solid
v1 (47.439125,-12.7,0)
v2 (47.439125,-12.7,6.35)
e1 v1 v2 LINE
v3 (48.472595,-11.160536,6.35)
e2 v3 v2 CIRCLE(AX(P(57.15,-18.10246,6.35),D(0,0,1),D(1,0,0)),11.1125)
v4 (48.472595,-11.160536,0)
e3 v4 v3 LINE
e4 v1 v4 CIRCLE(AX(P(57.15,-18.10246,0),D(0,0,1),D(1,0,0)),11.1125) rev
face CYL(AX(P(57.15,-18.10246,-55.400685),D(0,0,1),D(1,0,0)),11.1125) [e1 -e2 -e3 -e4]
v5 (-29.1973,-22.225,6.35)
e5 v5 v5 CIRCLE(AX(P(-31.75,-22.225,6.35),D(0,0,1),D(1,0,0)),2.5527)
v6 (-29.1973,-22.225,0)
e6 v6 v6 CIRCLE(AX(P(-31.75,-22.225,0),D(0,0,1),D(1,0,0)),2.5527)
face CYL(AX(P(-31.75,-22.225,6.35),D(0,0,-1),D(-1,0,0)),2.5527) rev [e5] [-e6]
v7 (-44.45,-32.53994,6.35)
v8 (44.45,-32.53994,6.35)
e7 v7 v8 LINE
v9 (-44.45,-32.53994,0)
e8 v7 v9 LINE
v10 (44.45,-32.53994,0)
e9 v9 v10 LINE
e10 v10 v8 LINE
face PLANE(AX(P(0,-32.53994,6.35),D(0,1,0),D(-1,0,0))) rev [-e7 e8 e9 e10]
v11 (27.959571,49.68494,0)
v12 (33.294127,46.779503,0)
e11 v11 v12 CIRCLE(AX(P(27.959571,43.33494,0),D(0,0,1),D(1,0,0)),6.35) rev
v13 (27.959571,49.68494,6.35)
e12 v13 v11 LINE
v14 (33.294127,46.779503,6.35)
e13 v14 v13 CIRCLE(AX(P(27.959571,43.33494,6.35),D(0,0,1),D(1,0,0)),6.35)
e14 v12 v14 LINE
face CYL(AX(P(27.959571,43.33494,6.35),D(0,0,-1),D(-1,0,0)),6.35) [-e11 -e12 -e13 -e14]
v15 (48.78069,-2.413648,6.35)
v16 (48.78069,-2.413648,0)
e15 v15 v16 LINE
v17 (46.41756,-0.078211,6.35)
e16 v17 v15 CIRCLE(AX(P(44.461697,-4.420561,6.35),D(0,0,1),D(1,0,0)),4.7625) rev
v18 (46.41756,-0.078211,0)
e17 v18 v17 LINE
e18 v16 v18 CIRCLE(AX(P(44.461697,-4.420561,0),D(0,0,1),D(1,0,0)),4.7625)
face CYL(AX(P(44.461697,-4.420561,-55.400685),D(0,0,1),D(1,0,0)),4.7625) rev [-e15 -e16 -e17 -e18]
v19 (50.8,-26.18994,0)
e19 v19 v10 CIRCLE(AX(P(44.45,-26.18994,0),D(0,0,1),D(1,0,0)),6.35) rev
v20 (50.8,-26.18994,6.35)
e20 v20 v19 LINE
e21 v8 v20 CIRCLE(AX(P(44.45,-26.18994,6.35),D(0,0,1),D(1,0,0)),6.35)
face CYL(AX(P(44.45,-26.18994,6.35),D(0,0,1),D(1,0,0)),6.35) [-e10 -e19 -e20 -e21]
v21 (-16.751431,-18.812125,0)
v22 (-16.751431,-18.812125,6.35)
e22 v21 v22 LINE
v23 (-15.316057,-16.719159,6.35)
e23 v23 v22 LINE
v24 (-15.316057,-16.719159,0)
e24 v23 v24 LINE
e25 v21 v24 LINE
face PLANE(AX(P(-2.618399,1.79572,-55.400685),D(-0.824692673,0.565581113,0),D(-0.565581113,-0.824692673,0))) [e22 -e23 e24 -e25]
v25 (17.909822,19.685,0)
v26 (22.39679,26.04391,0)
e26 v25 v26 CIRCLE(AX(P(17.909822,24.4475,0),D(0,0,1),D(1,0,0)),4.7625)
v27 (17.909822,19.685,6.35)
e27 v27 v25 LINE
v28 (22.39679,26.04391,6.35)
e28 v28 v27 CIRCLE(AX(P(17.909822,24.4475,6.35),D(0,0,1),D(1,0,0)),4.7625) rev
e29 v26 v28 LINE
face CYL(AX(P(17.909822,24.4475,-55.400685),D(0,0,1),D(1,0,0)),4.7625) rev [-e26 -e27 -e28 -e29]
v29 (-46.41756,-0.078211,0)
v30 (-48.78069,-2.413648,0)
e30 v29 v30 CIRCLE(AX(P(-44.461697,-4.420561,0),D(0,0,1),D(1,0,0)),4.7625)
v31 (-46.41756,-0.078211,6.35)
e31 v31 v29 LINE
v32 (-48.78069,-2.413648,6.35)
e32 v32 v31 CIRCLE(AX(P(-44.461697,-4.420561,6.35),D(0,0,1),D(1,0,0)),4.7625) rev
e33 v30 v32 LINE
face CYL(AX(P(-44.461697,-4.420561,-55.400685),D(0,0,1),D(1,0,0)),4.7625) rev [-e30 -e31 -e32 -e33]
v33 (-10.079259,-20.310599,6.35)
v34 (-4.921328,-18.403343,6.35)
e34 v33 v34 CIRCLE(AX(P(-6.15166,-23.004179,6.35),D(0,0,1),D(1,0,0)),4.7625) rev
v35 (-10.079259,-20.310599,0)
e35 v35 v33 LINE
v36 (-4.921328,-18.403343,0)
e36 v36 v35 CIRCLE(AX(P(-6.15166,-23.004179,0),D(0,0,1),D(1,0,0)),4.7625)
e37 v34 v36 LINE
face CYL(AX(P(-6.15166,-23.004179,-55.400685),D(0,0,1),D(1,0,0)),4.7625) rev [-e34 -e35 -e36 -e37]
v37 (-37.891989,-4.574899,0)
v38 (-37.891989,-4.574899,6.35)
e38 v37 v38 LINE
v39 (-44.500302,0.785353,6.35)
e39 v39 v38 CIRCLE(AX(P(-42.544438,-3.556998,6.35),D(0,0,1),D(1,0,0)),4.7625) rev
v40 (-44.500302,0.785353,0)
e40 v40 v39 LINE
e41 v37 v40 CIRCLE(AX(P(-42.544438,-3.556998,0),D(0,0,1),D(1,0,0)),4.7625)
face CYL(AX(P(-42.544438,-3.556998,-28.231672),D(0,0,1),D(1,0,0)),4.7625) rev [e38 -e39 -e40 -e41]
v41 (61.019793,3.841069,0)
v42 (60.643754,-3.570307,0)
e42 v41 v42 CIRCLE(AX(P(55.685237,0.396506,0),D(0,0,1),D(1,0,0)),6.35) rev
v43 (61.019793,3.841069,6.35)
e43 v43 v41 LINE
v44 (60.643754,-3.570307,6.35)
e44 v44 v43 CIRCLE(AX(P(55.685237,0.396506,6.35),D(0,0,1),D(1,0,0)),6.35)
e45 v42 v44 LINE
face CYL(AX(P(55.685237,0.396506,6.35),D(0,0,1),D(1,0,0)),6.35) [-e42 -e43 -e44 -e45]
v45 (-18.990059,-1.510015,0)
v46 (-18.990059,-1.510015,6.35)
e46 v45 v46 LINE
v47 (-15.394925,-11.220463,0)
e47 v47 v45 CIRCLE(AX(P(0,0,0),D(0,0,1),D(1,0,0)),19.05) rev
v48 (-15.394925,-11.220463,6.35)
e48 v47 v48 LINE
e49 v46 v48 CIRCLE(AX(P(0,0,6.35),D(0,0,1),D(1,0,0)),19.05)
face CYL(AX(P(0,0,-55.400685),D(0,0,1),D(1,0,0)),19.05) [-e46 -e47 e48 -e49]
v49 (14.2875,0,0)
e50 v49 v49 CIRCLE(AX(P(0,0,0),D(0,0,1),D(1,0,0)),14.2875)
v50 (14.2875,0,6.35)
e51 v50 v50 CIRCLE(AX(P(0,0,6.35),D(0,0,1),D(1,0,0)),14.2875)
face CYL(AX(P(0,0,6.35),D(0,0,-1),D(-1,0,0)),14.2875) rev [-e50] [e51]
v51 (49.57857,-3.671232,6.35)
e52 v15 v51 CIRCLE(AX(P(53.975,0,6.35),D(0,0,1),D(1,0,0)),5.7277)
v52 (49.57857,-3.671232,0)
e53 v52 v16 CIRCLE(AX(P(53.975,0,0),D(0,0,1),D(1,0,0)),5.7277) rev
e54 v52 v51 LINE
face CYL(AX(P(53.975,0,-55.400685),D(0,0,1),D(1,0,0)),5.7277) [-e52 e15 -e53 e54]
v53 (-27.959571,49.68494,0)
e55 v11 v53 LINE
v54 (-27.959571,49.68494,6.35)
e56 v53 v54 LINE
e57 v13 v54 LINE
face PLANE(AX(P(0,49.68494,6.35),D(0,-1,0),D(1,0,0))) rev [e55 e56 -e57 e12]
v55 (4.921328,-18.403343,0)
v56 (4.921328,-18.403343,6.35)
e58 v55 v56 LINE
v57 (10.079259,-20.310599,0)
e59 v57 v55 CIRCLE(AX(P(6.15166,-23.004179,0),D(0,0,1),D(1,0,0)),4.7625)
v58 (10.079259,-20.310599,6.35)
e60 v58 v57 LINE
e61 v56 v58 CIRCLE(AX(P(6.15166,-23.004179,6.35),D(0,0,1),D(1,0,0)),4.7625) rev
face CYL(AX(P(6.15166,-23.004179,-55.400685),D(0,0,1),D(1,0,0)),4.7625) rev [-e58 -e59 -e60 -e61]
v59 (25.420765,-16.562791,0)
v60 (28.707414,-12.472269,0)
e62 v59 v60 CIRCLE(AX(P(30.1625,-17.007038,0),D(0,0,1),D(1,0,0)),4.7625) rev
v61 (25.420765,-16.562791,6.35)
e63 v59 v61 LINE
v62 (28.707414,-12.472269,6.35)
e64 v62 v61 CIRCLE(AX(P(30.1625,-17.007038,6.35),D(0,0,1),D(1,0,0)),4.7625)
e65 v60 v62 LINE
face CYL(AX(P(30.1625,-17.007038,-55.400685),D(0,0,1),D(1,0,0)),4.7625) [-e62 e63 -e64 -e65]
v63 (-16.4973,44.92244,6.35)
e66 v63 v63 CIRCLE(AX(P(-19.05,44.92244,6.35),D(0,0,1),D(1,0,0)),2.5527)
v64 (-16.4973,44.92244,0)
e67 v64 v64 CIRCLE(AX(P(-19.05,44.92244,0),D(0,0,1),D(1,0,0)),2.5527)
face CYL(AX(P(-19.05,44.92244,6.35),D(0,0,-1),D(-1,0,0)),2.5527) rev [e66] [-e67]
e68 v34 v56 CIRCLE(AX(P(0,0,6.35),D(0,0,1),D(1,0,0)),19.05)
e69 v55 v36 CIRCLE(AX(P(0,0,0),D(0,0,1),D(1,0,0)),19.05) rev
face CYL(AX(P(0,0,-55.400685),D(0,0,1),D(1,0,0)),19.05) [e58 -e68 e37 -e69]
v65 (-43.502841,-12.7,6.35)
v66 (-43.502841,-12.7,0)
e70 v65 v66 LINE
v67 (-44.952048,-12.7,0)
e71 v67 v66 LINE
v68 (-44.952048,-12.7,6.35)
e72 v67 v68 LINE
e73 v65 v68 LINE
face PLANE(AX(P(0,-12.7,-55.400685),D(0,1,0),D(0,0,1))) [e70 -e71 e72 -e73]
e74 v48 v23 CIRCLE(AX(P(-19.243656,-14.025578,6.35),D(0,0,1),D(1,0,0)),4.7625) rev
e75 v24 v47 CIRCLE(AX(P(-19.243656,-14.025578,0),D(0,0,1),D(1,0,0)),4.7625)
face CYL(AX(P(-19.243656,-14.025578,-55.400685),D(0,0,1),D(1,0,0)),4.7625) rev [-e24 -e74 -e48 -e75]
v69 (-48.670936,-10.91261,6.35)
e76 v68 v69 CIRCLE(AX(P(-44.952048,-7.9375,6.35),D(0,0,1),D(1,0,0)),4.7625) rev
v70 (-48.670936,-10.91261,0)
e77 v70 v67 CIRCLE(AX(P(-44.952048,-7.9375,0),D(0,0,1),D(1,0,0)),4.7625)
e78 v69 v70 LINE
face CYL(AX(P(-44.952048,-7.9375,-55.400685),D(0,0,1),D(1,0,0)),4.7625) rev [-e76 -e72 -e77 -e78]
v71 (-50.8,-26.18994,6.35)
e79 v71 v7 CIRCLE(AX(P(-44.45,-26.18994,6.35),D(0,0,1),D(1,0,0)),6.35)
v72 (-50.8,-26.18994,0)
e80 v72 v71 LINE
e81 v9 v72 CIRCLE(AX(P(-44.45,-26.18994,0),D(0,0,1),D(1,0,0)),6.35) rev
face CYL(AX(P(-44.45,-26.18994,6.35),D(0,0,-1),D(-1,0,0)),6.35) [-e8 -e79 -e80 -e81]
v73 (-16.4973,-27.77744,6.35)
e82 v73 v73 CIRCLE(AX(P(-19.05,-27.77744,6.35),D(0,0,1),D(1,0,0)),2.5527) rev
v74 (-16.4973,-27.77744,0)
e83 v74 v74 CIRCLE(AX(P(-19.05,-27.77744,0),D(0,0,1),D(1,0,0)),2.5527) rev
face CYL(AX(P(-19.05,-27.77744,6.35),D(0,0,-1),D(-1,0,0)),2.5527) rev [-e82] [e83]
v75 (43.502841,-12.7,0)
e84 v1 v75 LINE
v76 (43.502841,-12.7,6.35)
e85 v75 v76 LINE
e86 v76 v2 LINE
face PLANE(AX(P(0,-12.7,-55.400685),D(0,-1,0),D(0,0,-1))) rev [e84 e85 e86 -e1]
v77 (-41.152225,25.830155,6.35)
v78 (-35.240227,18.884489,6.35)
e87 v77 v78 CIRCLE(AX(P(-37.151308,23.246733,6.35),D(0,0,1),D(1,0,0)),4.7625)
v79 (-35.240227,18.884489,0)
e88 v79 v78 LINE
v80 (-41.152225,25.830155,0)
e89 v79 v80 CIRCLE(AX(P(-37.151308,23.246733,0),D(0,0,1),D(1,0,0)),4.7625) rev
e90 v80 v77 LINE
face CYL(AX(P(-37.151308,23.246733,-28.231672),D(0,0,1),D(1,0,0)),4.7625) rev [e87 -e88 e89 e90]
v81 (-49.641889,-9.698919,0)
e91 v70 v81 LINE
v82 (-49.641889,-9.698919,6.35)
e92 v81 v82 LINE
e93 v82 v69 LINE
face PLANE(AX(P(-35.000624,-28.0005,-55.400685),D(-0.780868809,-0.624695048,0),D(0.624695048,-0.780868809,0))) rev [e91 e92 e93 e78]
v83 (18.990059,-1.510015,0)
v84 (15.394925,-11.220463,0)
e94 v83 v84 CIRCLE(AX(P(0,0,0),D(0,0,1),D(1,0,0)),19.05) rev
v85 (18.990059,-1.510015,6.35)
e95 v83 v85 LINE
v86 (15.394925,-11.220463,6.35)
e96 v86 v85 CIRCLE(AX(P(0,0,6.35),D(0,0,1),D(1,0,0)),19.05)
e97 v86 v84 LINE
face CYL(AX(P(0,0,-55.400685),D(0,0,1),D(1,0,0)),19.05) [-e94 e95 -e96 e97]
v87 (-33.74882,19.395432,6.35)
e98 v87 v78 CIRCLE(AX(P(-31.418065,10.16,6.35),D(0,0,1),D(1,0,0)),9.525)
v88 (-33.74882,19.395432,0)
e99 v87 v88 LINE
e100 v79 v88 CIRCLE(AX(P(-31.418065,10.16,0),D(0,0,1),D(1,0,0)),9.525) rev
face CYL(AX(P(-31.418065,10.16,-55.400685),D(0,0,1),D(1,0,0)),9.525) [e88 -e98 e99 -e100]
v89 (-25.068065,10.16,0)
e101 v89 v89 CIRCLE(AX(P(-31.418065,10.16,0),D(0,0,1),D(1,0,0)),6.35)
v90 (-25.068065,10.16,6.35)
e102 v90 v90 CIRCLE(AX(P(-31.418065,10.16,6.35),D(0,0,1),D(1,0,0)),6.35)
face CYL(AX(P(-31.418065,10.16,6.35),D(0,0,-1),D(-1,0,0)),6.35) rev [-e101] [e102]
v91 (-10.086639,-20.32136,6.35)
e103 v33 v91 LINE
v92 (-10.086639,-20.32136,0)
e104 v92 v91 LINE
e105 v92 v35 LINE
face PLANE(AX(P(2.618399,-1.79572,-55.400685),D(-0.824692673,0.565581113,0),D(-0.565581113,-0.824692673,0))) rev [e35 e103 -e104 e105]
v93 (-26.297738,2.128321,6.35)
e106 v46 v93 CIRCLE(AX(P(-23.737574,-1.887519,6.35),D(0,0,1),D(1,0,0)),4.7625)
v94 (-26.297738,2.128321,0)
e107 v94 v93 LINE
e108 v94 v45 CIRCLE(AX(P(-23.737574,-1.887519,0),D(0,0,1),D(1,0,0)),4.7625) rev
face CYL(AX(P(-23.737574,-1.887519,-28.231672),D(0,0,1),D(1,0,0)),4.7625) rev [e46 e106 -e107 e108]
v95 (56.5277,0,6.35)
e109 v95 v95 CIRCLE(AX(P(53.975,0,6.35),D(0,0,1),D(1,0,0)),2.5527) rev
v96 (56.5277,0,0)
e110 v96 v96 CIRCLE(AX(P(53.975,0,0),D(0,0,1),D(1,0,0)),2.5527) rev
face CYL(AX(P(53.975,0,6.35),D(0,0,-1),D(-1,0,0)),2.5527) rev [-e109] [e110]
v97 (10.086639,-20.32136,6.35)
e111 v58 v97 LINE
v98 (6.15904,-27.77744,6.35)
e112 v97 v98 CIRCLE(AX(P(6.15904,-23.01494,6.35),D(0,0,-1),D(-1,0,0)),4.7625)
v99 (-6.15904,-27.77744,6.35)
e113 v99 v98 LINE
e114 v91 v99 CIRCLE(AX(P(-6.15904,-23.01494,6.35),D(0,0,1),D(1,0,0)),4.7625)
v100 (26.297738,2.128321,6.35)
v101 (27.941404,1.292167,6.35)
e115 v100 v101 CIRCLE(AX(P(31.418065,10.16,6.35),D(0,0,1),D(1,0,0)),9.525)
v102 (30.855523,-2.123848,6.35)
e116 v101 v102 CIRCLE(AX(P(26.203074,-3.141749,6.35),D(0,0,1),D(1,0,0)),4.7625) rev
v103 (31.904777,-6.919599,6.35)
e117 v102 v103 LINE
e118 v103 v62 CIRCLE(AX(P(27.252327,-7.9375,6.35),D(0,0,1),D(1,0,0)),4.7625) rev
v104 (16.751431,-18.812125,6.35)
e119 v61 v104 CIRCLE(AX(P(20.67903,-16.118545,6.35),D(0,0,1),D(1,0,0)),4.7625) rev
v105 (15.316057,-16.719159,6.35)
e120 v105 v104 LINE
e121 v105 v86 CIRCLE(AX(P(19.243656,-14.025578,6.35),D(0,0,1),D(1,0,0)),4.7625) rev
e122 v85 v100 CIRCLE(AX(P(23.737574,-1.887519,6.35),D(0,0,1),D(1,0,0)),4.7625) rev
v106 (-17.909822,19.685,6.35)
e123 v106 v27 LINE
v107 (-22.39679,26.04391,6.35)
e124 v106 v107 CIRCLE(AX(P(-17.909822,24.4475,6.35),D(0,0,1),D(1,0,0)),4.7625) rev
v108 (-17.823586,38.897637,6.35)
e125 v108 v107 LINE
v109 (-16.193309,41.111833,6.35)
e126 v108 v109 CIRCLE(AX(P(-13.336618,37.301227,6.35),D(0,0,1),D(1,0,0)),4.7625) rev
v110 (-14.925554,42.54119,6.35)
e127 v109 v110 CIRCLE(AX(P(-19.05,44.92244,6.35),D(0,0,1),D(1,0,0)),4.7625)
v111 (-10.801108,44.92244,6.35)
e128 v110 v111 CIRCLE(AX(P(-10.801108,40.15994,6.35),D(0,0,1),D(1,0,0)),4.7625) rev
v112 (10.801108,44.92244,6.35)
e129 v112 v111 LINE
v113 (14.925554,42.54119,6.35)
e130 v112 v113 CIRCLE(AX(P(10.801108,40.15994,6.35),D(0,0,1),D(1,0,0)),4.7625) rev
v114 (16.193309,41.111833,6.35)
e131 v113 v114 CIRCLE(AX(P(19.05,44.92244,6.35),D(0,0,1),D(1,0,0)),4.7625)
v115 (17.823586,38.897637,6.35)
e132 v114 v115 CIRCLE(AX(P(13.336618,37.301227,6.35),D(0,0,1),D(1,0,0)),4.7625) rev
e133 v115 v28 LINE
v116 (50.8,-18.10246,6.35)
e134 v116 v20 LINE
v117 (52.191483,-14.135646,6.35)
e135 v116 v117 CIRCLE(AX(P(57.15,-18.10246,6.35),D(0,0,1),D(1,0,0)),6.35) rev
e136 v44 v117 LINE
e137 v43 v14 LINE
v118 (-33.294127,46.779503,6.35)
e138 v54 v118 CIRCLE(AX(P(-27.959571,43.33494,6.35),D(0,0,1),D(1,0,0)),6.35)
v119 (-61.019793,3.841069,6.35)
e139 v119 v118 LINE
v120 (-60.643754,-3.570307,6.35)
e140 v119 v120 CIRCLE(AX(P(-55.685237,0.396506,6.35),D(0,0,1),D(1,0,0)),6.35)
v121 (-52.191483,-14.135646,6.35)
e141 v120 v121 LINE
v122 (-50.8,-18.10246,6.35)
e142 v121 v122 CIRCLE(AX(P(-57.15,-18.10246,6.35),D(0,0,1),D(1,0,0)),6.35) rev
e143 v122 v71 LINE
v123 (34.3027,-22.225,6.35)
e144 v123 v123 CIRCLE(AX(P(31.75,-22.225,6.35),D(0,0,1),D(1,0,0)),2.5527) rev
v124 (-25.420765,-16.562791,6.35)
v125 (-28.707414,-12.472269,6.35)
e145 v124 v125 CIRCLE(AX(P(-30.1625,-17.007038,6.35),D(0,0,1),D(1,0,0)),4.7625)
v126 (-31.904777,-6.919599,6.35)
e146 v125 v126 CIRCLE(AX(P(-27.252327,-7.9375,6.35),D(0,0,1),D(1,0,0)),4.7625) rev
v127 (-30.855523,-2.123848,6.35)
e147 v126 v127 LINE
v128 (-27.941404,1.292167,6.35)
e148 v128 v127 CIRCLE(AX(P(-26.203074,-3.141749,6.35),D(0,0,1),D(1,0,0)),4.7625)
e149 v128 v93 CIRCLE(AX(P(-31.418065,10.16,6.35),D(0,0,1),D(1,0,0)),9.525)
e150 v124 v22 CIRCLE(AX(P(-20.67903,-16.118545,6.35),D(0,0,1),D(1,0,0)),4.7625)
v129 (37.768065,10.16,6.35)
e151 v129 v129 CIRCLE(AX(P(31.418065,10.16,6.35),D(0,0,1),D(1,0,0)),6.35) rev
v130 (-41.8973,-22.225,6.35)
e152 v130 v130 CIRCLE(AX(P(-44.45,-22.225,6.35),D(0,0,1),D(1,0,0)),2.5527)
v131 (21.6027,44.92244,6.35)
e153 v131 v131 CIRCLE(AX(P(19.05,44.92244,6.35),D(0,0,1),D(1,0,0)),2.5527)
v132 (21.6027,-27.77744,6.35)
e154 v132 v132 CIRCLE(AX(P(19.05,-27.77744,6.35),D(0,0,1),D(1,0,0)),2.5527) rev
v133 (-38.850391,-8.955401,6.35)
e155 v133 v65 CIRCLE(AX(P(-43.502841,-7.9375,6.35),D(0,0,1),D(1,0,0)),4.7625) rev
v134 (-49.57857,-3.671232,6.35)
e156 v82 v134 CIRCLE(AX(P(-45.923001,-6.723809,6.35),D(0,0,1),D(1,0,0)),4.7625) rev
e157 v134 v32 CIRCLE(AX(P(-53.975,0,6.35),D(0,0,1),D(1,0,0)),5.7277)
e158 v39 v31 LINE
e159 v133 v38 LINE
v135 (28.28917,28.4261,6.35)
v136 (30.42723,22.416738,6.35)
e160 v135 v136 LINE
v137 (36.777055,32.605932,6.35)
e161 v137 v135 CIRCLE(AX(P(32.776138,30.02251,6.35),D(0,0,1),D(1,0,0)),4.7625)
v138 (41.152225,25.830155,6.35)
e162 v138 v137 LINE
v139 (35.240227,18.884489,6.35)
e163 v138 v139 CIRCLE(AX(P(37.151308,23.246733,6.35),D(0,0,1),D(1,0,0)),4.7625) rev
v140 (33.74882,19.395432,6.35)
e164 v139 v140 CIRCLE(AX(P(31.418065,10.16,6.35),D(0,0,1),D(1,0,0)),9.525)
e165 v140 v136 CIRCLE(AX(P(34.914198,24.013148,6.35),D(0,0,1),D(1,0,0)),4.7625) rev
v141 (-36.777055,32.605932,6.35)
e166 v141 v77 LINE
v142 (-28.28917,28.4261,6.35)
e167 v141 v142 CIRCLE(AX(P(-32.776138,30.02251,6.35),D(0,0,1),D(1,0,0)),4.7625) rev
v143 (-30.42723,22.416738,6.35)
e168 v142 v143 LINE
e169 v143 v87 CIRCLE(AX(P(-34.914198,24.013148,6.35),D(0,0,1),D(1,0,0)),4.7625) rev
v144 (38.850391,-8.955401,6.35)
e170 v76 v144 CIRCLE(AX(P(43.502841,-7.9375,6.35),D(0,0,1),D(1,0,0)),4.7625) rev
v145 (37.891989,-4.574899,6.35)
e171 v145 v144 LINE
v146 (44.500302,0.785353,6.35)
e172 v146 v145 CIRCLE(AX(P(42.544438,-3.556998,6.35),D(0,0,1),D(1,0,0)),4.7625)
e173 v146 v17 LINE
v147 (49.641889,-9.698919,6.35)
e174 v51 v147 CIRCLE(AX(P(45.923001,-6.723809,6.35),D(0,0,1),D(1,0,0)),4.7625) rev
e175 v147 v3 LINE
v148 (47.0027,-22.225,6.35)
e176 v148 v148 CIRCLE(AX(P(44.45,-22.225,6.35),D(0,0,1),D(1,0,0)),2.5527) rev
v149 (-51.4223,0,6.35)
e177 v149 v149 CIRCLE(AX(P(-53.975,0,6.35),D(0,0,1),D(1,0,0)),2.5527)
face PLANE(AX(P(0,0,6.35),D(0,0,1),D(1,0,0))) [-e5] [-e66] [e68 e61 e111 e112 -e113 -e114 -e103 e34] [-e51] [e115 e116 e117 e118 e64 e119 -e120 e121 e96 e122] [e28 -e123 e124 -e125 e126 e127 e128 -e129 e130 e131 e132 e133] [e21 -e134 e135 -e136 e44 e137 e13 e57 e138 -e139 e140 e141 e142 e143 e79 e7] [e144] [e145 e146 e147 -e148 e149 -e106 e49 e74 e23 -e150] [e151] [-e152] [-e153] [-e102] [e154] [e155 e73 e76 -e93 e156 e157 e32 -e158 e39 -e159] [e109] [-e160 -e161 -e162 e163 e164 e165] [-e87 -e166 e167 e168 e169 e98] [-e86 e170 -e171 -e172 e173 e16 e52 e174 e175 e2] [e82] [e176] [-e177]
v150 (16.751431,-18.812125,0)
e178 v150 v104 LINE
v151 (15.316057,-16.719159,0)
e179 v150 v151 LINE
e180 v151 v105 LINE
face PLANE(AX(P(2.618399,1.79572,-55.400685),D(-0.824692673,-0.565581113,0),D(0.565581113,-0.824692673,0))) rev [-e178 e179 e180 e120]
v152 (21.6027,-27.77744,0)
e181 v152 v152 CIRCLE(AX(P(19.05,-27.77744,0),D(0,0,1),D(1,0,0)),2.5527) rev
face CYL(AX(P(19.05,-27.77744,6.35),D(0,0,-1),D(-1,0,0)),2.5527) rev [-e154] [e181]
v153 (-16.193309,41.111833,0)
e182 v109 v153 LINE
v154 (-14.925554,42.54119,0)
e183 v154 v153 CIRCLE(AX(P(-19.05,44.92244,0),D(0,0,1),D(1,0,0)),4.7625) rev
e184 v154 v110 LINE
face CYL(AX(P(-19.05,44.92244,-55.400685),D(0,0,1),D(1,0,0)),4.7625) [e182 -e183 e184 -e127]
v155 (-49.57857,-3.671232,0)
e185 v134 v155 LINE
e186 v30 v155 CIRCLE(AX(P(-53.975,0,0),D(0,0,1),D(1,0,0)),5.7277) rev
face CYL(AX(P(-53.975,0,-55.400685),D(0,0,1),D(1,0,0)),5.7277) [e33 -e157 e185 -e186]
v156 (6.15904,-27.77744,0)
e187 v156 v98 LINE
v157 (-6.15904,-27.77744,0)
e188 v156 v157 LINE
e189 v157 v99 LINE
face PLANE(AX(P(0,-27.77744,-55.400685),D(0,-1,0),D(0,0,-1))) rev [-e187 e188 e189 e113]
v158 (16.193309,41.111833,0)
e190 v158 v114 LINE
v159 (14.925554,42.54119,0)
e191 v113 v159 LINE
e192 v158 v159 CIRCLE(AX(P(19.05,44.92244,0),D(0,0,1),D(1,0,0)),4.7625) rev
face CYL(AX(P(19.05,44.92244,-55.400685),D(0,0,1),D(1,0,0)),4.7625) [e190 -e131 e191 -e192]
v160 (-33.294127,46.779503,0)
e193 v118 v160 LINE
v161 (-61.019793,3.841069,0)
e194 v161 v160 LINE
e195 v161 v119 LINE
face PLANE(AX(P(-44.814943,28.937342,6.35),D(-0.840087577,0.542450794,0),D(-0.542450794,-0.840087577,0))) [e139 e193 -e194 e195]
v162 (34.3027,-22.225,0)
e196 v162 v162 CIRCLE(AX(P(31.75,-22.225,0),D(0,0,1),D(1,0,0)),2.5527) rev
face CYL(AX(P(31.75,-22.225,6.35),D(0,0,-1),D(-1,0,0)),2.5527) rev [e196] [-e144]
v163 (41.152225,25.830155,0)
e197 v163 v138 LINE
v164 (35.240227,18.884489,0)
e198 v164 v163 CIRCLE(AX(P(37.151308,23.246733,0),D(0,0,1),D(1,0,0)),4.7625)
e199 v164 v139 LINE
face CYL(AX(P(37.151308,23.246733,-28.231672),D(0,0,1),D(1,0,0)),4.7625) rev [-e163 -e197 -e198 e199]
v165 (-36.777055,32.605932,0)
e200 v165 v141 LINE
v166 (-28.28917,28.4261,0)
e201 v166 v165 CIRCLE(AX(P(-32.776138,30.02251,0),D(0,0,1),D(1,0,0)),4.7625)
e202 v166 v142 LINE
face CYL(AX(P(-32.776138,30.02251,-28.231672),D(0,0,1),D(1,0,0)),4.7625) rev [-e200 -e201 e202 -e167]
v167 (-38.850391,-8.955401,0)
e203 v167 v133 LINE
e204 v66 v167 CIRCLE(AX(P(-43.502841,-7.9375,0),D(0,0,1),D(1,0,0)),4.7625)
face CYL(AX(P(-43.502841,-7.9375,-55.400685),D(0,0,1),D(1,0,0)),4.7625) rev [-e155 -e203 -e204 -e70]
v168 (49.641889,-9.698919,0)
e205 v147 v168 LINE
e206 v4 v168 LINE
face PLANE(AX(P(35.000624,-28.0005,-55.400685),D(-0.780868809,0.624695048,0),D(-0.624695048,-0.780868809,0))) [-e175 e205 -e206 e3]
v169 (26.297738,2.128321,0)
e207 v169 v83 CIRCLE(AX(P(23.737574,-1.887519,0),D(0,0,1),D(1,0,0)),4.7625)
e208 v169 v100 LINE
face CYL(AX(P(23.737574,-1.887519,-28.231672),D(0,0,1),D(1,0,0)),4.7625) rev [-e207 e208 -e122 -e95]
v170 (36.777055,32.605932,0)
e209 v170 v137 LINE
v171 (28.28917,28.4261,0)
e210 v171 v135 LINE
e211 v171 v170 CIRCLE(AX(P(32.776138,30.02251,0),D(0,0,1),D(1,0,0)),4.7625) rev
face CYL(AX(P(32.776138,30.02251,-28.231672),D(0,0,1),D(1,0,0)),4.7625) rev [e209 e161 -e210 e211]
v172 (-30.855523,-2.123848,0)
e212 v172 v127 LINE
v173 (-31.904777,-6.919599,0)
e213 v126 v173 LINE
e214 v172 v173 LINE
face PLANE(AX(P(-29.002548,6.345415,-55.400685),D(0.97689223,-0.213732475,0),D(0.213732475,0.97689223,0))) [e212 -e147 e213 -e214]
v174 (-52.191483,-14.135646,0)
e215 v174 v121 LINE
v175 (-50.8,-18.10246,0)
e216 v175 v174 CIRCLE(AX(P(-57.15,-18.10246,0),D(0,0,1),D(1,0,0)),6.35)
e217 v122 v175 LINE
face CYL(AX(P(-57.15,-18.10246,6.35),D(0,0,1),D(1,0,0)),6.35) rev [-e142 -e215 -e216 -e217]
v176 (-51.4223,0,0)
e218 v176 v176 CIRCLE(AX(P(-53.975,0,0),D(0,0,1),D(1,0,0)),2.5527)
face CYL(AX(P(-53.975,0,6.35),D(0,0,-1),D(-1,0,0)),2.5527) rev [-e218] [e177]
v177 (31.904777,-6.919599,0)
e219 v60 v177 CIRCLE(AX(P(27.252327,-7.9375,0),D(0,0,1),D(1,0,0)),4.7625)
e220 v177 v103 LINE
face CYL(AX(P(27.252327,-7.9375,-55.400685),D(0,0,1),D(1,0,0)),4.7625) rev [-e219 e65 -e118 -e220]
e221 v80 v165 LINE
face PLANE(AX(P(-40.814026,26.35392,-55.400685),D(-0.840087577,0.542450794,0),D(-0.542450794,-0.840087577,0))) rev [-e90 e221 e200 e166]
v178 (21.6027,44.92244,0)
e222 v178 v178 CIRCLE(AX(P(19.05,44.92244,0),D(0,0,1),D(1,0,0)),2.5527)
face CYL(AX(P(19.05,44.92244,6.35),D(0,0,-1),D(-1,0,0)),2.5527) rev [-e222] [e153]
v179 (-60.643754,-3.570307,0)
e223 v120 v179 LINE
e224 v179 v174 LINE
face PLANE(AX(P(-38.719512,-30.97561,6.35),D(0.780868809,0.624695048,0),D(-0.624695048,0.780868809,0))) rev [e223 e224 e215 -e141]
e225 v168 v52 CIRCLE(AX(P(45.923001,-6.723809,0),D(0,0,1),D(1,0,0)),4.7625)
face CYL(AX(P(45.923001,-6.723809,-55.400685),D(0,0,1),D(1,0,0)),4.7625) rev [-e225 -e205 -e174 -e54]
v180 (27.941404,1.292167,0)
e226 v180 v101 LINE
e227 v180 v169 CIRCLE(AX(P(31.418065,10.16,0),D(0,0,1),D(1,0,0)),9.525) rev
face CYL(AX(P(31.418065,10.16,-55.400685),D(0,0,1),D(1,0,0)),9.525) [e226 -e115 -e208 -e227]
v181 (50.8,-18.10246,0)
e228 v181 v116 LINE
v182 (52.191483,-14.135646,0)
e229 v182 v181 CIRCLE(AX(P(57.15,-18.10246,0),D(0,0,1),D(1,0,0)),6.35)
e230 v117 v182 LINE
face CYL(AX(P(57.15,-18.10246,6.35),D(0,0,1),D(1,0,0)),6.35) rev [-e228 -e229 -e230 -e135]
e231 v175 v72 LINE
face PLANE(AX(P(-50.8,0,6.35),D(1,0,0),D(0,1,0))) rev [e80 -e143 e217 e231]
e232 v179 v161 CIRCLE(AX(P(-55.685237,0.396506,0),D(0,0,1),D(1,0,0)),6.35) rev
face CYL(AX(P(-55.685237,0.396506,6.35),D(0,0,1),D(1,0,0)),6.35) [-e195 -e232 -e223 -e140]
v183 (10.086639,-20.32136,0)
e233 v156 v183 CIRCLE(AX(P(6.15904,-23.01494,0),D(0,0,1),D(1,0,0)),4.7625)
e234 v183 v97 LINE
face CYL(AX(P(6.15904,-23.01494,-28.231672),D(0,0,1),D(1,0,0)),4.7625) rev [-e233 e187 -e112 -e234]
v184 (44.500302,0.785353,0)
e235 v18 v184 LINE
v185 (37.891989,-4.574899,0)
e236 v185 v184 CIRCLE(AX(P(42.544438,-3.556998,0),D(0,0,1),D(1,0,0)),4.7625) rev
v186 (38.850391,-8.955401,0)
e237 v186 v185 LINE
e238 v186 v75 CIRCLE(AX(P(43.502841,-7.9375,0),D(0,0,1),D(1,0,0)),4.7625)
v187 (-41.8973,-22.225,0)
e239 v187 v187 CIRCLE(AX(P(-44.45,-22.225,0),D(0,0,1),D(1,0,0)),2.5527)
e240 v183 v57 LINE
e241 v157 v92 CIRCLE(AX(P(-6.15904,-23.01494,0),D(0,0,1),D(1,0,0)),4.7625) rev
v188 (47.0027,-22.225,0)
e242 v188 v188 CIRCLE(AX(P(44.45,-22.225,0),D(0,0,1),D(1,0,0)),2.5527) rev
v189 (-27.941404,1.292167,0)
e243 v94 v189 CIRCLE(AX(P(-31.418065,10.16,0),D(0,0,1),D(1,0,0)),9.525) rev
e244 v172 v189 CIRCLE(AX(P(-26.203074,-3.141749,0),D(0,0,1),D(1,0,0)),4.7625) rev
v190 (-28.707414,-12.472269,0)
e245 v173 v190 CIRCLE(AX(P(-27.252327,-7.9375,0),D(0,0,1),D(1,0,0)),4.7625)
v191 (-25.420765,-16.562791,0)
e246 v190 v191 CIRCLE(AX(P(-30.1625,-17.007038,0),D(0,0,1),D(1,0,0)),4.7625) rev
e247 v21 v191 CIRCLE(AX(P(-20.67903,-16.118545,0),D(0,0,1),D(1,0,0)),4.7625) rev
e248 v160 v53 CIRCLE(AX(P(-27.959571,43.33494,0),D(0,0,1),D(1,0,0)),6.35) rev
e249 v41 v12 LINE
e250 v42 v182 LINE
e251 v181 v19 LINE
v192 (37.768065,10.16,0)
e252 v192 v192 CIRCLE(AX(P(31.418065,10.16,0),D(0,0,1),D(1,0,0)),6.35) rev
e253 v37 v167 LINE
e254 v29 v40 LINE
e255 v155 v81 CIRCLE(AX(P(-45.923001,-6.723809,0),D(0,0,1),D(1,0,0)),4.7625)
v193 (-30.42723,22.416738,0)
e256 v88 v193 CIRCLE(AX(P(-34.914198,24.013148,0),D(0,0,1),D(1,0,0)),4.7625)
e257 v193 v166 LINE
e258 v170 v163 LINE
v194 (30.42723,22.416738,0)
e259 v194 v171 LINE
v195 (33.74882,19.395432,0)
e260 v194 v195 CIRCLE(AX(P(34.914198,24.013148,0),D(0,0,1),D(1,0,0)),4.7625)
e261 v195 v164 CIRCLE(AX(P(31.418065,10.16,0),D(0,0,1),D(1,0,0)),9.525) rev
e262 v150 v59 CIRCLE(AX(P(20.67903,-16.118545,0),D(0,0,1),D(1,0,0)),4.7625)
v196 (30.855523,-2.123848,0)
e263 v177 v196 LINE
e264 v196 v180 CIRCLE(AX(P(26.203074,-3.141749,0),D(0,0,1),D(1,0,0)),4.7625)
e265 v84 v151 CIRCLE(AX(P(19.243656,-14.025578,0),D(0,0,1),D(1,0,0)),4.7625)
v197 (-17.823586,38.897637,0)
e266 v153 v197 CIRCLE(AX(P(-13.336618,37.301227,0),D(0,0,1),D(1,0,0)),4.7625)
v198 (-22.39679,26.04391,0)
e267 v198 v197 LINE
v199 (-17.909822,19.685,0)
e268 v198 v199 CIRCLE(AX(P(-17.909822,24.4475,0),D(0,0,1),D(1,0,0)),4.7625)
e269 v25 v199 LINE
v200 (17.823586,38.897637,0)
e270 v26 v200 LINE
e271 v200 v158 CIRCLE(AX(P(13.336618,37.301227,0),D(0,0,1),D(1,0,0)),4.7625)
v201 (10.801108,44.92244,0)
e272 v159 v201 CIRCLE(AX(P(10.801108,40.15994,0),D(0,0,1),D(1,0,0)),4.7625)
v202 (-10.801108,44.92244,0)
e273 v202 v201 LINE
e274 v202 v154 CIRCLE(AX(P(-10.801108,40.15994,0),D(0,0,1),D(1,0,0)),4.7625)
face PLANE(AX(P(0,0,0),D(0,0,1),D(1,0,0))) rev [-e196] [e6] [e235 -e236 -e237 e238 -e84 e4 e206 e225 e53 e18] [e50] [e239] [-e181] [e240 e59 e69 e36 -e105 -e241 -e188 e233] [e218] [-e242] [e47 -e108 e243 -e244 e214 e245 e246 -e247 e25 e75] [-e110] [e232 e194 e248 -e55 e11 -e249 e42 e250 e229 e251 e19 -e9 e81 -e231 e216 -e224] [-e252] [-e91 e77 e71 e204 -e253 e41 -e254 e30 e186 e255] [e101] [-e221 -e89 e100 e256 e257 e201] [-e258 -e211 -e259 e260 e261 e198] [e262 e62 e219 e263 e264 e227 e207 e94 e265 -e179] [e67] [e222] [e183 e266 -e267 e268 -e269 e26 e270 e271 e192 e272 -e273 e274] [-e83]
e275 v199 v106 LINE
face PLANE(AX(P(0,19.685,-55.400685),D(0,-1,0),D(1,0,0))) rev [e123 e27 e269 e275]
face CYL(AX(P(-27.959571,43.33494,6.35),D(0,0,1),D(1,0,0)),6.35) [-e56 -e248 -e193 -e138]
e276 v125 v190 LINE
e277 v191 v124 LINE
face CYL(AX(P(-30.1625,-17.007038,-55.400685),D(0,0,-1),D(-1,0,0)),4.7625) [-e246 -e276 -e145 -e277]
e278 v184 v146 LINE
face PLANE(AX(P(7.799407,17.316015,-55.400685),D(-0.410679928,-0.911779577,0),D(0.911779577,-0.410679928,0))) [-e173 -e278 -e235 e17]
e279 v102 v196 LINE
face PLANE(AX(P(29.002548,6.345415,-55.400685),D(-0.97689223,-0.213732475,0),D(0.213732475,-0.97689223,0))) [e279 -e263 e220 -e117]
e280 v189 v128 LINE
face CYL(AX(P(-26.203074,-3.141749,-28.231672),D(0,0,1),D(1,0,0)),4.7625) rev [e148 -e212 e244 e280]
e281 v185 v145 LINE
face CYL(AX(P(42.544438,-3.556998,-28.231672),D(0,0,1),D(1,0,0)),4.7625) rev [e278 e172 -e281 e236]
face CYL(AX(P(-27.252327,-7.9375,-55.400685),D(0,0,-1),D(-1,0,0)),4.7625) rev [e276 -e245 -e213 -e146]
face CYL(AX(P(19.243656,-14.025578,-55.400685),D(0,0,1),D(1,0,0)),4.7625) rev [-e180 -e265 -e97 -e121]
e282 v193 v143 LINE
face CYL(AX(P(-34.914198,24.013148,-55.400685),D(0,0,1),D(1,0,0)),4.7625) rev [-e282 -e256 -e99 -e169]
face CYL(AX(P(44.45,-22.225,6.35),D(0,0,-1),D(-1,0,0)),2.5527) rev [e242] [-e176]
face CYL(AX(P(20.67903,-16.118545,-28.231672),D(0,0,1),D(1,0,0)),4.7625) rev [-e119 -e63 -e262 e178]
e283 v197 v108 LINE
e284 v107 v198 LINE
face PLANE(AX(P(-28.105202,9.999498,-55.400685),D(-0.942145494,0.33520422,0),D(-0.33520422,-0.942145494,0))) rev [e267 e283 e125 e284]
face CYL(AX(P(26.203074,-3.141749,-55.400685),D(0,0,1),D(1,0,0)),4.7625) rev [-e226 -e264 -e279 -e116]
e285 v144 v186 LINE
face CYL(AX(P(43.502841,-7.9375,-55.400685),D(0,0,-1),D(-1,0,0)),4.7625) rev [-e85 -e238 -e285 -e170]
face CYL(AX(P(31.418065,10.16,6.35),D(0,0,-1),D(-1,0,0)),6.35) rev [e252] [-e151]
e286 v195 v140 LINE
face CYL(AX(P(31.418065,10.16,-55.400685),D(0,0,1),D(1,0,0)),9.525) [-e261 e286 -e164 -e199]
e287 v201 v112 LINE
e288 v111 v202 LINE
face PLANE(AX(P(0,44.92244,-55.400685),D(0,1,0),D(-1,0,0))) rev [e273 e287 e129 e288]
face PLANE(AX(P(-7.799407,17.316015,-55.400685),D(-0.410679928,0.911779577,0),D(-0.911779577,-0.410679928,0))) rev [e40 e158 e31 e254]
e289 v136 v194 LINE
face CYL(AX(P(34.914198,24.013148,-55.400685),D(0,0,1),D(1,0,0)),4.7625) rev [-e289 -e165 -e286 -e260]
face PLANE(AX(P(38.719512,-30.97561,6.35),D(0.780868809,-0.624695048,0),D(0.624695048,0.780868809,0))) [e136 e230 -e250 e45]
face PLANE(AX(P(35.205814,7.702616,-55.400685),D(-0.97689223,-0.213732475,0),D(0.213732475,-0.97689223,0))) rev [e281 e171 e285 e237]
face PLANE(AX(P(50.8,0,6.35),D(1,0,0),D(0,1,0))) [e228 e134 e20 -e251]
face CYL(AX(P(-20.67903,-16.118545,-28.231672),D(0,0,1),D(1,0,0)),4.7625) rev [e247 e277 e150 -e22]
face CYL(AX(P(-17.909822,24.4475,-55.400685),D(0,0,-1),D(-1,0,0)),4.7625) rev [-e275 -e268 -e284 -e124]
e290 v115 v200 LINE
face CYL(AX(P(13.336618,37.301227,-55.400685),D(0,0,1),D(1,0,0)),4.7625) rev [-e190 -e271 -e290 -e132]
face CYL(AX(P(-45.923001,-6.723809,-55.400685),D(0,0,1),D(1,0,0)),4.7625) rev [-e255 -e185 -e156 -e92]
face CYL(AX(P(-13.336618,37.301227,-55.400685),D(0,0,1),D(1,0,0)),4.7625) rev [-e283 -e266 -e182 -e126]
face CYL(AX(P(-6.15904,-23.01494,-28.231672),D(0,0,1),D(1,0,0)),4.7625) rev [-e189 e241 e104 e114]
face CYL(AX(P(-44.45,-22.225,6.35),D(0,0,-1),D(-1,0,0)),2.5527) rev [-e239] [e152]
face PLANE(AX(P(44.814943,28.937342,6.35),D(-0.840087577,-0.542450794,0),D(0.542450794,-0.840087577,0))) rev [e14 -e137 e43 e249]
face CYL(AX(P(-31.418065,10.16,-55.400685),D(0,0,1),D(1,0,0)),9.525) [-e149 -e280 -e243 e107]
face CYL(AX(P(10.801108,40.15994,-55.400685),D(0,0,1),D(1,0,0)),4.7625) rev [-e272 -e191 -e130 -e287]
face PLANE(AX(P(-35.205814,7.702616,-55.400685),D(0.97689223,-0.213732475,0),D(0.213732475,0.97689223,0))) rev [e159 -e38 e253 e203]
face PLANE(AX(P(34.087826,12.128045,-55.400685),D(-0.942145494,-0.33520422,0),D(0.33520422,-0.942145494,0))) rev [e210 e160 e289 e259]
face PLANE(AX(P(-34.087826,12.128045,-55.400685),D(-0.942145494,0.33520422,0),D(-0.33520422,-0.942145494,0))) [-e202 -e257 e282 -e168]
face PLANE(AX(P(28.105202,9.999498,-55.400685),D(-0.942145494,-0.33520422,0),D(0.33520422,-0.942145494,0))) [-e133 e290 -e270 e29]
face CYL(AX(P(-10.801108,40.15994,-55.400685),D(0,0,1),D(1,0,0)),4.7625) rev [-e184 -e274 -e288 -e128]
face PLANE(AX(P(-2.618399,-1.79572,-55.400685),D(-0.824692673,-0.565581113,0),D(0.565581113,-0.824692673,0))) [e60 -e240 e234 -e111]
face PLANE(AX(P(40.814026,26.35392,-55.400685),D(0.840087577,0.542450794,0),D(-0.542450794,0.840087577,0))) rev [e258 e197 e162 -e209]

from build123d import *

# Parameters (mm, degrees)
SKETCH5_R           = 14.2875
SKETCH5_R_2         = 2.5527
SKETCH5_R_3         = 6.35
BOSS_EXTRUDE1_DEPTH = 6.35
FILLET3_R           = 6.35
CUT_EXTRUDE2_START  = -6.35
CUT_EXTRUDE2_DEPTH  = 6.35
FILLET4_R           = 4.7625
FILLET5_R           = 4.7625
BOSS_EXTRUDE3_START = -6.35
BOSS_EXTRUDE3_DEPTH = 6.35
FILLET6_R           = 4.7625


# Read off the part's stored shape, not the designer's step: Cut-Extrude2
with BuildPart() as part:
    # Sketch5 → Boss-Extrude1 (new body)
    with BuildSketch(Plane.XY):
        Polygon((31.418064867, 49.68494), (-31.418064867, 49.68494), (-63.5, 0), (-50.8, -15.875), (-50.8, -32.53994), (50.8, -32.53994), (50.8, -15.875), (63.5, 0), align=None)
        Circle(SKETCH5_R, mode=Mode.SUBTRACT)
        with Locations((-19.05, 44.92244)):
            Circle(SKETCH5_R_2, mode=Mode.SUBTRACT)
        with Locations((19.05, 44.92244)):
            Circle(SKETCH5_R_2, mode=Mode.SUBTRACT)
        with Locations((19.05, -27.77744)):
            Circle(SKETCH5_R_2, mode=Mode.SUBTRACT)
        with Locations((-19.05, -27.77744)):
            Circle(SKETCH5_R_2, mode=Mode.SUBTRACT)
        with Locations((-53.975, 0)):
            Circle(SKETCH5_R_2, mode=Mode.SUBTRACT)
        with Locations((-31.418064867, 10.16)):
            Circle(SKETCH5_R_3, mode=Mode.SUBTRACT)
        with Locations((31.418064867, 10.16)):
            Circle(SKETCH5_R_3, mode=Mode.SUBTRACT)
        with Locations((-44.45, -22.225)):
            Circle(SKETCH5_R_2, mode=Mode.SUBTRACT)
        with Locations((-31.75, -22.225)):
            Circle(SKETCH5_R_2, mode=Mode.SUBTRACT)
        with Locations((31.75, -22.225)):
            Circle(SKETCH5_R_2, mode=Mode.SUBTRACT)
        with Locations((44.45, -22.225)):
            Circle(SKETCH5_R_2, mode=Mode.SUBTRACT)
        with Locations((53.975, 0)):
            Circle(SKETCH5_R_2, mode=Mode.SUBTRACT)
    extrude(amount=BOSS_EXTRUDE1_DEPTH)

    # Fillet3
    fillet3_edges = [part.edges().sort_by_distance(p)[0] for p in [
        (50.8, -15.875, 3.175),
        (50.8, -32.53994, 3.175),
        (-50.8, -32.53994, 3.175),
        (-50.8, -15.875, 3.175),
        (-63.5, 0, 3.175),
        (-31.418064867, 49.68494, 3.175),
        (31.418064867, 49.68494, 3.175),
        (63.5, 0, 3.175),
    ]]
    fillet(fillet3_edges, radius=FILLET3_R)

    # Cut-Extrude2 outline → Cut-Extrude2 (cut)
    with BuildSketch(Plane.XY.offset(6.35).offset(CUT_EXTRUDE2_START)):
        with BuildLine():
            ThreePointArc((-14.2875, 44.92244), (-15.096478785, 42.267053729), (-17.24858189, 40.51377818))
            Line((-17.24858189, 40.51377818), (-24.659214735, 19.685))
            Line((-24.659214735, 19.685), (24.659214735, 19.685))
            Line((24.659214735, 19.685), (17.24858189, 40.51377818))
            ThreePointArc((17.24858189, 40.51377818), (15.096478785, 42.267053729), (14.2875, 44.92244))
            Line((14.2875, 44.92244), (-14.2875, 44.92244))
        make_face()
        with BuildLine():
            ThreePointArc((-23.231205774, 42.642324976), (-23.66488888, 43.745916785), (-23.8125, 44.92244))
            Line((-23.8125, 44.92244), (-27.959571324, 44.92244))
            ThreePointArc((-27.959571324, 44.92244), (-28.718878736, 44.729073603), (-29.293210351, 44.196080635))
            Line((-29.293210351, 44.196080635), (-54.133954184, 5.72549394))
            ThreePointArc((-54.133954184, 5.72549394), (-52.468531038, 5.526038233), (-50.932299333, 4.852681727))
            Line((-50.932299333, 4.852681727), (-40.909987764, 9.366889218))
            ThreePointArc((-40.909987764, 9.366889218), (-38.42805792, 16.608691526), (-31.418064867, 19.685))
            Line((-31.418064867, 19.685), (-31.399150386, 19.685))
            Line((-31.399150386, 19.685), (-23.231205774, 42.642324976))
        make_face()
        with BuildLine():
            ThreePointArc((29.293210351, 44.196080635), (28.718878736, 44.729073603), (27.959571324, 44.92244))
            Line((27.959571324, 44.92244), (23.8125, 44.92244))
            ThreePointArc((23.8125, 44.92244), (23.66488888, 43.745916785), (23.231205774, 42.642324976))
            Line((23.231205774, 42.642324976), (31.399150386, 19.685))
            Line((31.399150386, 19.685), (31.418064867, 19.685))
            ThreePointArc((31.418064867, 19.685), (38.42805792, 16.608691526), (40.909987764, 9.366889218))
            Line((40.909987764, 9.366889218), (50.932299333, 4.852681727))
            ThreePointArc((50.932299333, 4.852681727), (52.468531038, 5.526038233), (54.133954184, 5.72549394))
            Line((54.133954184, 5.72549394), (29.293210351, 44.196080635))
        make_face()
        with BuildLine():
            ThreePointArc((52.900253262, -5.625963628), (49.87577884, -4.00036663), (48.32448179, -0.937118585))
            Line((48.32448179, -0.937118585), (38.302170221, 3.577088905))
            ThreePointArc((38.302170221, 3.577088905), (37.418387266, 2.762584498), (36.439070065, 2.06585818))
            Line((36.439070065, 2.06585818), (39.669665333, -12.7))
            Line((39.669665333, -12.7), (47.439125418, -12.7))
            ThreePointArc((47.439125418, -12.7), (47.923695725, -11.908675288), (48.472595355, -11.160536011))
            Line((48.472595355, -11.160536011), (52.900253262, -5.625963628))
        make_face()
        with BuildLine():
            ThreePointArc((30.235804404, 0.708656963), (26.674393311, 1.900266036), (23.850400744, 4.375876495))
            Line((23.850400744, 4.375876495), (18.84920946, 2.758587089))
            ThreePointArc((18.84920946, 2.758587089), (18.031678121, -6.145004812), (13.242022218, -13.694938757))
            Line((13.242022218, -13.694938757), (19.633756794, -23.01494))
            Line((19.633756794, -23.01494), (25.4, -23.01494))
            Line((25.4, -23.01494), (25.4, -12.7))
            Line((25.4, -12.7), (33.169460085, -12.7))
            Line((33.169460085, -12.7), (30.235804404, 0.708656963))
        make_face()
        with BuildLine():
            Line((-47.439125418, -12.7), (-39.669665333, -12.7))
            Line((-39.669665333, -12.7), (-36.439070065, 2.06585818))
            ThreePointArc((-36.439070065, 2.06585818), (-37.418387266, 2.762584498), (-38.302170221, 3.577088905))
            Line((-38.302170221, 3.577088905), (-48.32448179, -0.937118585))
            ThreePointArc((-48.32448179, -0.937118585), (-49.87577884, -4.00036663), (-52.900253262, -5.625963628))
            Line((-52.900253262, -5.625963628), (-48.472595355, -11.160536011))
            ThreePointArc((-48.472595355, -11.160536011), (-47.923695725, -11.908675288), (-47.439125418, -12.7))
        make_face()
        with BuildLine():
            Line((-33.169460085, -12.7), (-25.4, -12.7))
            Line((-25.4, -12.7), (-25.4, -23.01494))
            Line((-25.4, -23.01494), (-19.633756794, -23.01494))
            Line((-19.633756794, -23.01494), (-13.242022218, -13.694938757))
            ThreePointArc((-13.242022218, -13.694938757), (-18.031678121, -6.145004812), (-18.84920946, 2.758587089))
            Line((-18.84920946, 2.758587089), (-23.850400744, 4.375876495))
            ThreePointArc((-23.850400744, 4.375876495), (-26.674393311, 1.900266036), (-30.235804404, 0.708656963))
            Line((-30.235804404, 0.708656963), (-33.169460085, -12.7))
        make_face()
        with BuildLine():
            ThreePointArc((8.005223744, -17.286378823), (0, -19.05), (-8.005223744, -17.286378823))
            Line((-8.005223744, -17.286378823), (-14.423924732, -26.64570069))
            ThreePointArc((-14.423924732, -26.64570069), (-14.32172919, -27.207473867), (-14.2875, -27.77744))
            Line((-14.2875, -27.77744), (14.2875, -27.77744))
            ThreePointArc((14.2875, -27.77744), (14.32172919, -27.207473867), (14.423924732, -26.64570069))
            Line((14.423924732, -26.64570069), (8.005223744, -17.286378823))
        make_face()
    extrude(amount=CUT_EXTRUDE2_DEPTH, mode=Mode.SUBTRACT)

    # Fillet4
    fillet4_edges = [part.edges().sort_by_distance(p)[0] for p in [
        (30.235804404, 0.708656963, 3.175),
        (33.169460085, -12.7, 3.175),
        (39.669665333, -12.7, 3.175),
        (40.909987764, 9.366889218, 3.175),
        (31.399150386, 19.685, 3.175),
        (14.2875, 44.92244, 3.175),
        (17.24858189, 40.51377818, 3.175),
        (24.659214735, 19.685, 3.175),
        (-24.659214735, 19.685, 3.175),
        (-17.24858189, 40.51377818, 3.175),
        (-14.2875, 44.92244, 3.175),
        (-47.439125418, -12.7, 3.175),
        (-40.909987764, 9.366889218, 3.175),
        (-31.399150386, 19.685, 3.175),
        (25.4, -23.01494, 3.175),
        (13.242022218, -13.694938757, 3.175),
        (-8.005223744, -17.286378823, 3.175),
        (8.005223744, -17.286378823, 3.175),
        (-13.242022218, -13.694938757, 3.175),
        (-25.4, -23.01494, 3.175),
        (-33.169460085, -12.7, 3.175),
        (-39.669665333, -12.7, 3.175),
    ]]
    fillet(fillet4_edges, radius=FILLET4_R)

    # Fillet5
    fillet5_edges = [part.edges().sort_by_distance(p)[0] for p in [
        (25.4, -12.7, 3.175),
        (-25.4, -12.7, 3.175),
    ]]
    fillet(fillet5_edges, radius=FILLET5_R)

    # Sketch9 → Boss-Extrude3 (add)
    with BuildSketch(Plane.XY.offset(6.35).offset(BOSS_EXTRUDE3_START)):
        with BuildLine():
            ThreePointArc((-14.423924732, -26.64570069), (-14.32172919, -27.207473866), (-14.2875, -27.77744))
            Line((-14.2875, -27.77744), (-6.159040257, -27.77744))
            ThreePointArc((-6.159040257, -27.77744), (-10.372683647, -25.234538079), (-10.086639112, -20.321359951))
            Line((-10.086639112, -20.321359951), (-14.423924732, -26.64570069))
        make_face()
        with BuildLine():
            ThreePointArc((-44.500301557, 0.785352616), (-39.5442772, 0.141710133), (-37.891989153, -4.574898531))
            Line((-37.891989153, -4.574898531), (-36.439070065, 2.06585818))
            ThreePointArc((-36.439070065, 2.06585818), (-37.418387266, 2.762584498), (-38.302170221, 3.577088905))
            Line((-38.302170221, 3.577088905), (-44.500301557, 0.785352616))
        make_face()
        with BuildLine():
            ThreePointArc((-35.240227029, 18.884488604), (-40.77793511, 20.159827845), (-41.152225194, 25.830154811))
            Line((-41.152225194, 25.830154811), (-54.133954184, 5.72549394))
            ThreePointArc((-54.133954184, 5.72549394), (-52.468531038, 5.526038233), (-50.932299333, 4.852681727))
            Line((-50.932299333, 4.852681727), (-43.553698193, 8.176120268))
            ThreePointArc((-43.553698193, 8.176120268), (-41.737648648, 9.610880295), (-40.812395856, 11.732313668))
            ThreePointArc((-40.812395856, 11.732313668), (-38.93187378, 16.013913274), (-35.240227029, 18.884488604))
        make_face()
        with BuildLine():
            Line((-28.289170341, 28.426100235), (-23.231205774, 42.642324976))
            ThreePointArc((-23.231205774, 42.642324976), (-23.66488888, 43.745916785), (-23.8125, 44.92244))
            Line((-23.8125, 44.92244), (-27.959571324, 44.92244))
            ThreePointArc((-27.959571324, 44.92244), (-28.718878736, 44.729073603), (-29.293210351, 44.196080635))
            Line((-29.293210351, 44.196080635), (-36.777055337, 32.605932237))
            ThreePointArc((-36.777055337, 32.605932237), (-30.672139622, 34.295050092), (-28.289170341, 28.426100235))
        make_face()
        with BuildLine():
            Line((-19.633756794, -23.01494), (-16.751431072, -18.812124787))
            ThreePointArc((-16.751431072, -18.812124787), (-21.875098321, -20.728406628), (-25.420764964, -16.562791399))
            ThreePointArc((-25.420764964, -16.562791399), (-25.405194073, -16.784672213), (-25.4, -17.00703806))
            Line((-25.4, -17.00703806), (-25.4, -18.25244))
            ThreePointArc((-25.4, -18.25244), (-24.005096045, -21.620036045), (-20.6375, -23.01494))
            Line((-20.6375, -23.01494), (-19.633756794, -23.01494))
        make_face()
        with BuildLine():
            Line((-18.84920946, 2.758587089), (-23.850400744, 4.375876495))
            ThreePointArc((-23.850400744, 4.375876495), (-24.975304786, 3.144555072), (-26.297737736, 2.128320532))
            ThreePointArc((-26.297737736, 2.128320532), (-21.614958235, 2.37580202), (-18.990059337, -1.510015361))
            ThreePointArc((-18.990059337, -1.510015361), (-19.039637798, 0.628245583), (-18.84920946, 2.758587089))
        make_face()
        with BuildLine():
            Line((-30.235804404, 0.708656963), (-30.855523016, -2.123847999))
            ThreePointArc((-30.855523016, -2.123847999), (-29.826305242, -0.05085908), (-27.941404136, 1.292167392))
            ThreePointArc((-27.941404136, 1.292167392), (-29.070404803, 0.92885071), (-30.235804404, 0.708656963))
        make_face()
        with BuildLine():
            Line((6.159040257, -27.77744), (14.2875, -27.77744))
            ThreePointArc((14.2875, -27.77744), (14.32172919, -27.207473866), (14.423924732, -26.64570069))
            Line((14.423924732, -26.64570069), (10.086639112, -20.321359951))
            ThreePointArc((10.086639112, -20.321359951), (10.372683647, -25.234538079), (6.159040257, -27.77744))
        make_face()
        with BuildLine():
            Line((25.4, -18.25244), (25.4, -17.00703806))
            ThreePointArc((25.4, -17.00703806), (25.405194073, -16.784672213), (25.420764964, -16.562791399))
            ThreePointArc((25.420764964, -16.562791399), (21.875098321, -20.728406628), (16.751431072, -18.812124787))
            Line((16.751431072, -18.812124787), (19.633756794, -23.01494))
            Line((19.633756794, -23.01494), (20.6375, -23.01494))
            ThreePointArc((20.6375, -23.01494), (24.005096045, -21.620036045), (25.4, -18.25244))
        make_face()
        with BuildLine():
            ThreePointArc((26.297737736, 2.128320532), (24.975304786, 3.144555072), (23.850400744, 4.375876495))
            Line((23.850400744, 4.375876495), (18.84920946, 2.758587089))
            ThreePointArc((18.84920946, 2.758587089), (19.039637798, 0.628245583), (18.990059337, -1.510015361))
            ThreePointArc((18.990059337, -1.510015361), (21.614958235, 2.37580202), (26.297737736, 2.128320532))
        make_face()
        with BuildLine():
            Line((44.500301557, 0.785352616), (38.302170221, 3.577088905))
            ThreePointArc((38.302170221, 3.577088905), (37.418387266, 2.762584498), (36.439070065, 2.06585818))
            Line((36.439070065, 2.06585818), (37.891989153, -4.574898531))
            ThreePointArc((37.891989153, -4.574898531), (39.5442772, 0.141710133), (44.500301557, 0.785352616))
        make_face()
        with BuildLine():
            ThreePointArc((52.900253262, -5.625963628), (52.261062868, -5.465250845), (51.644566792, -5.232172431))
            ThreePointArc((51.644566792, -5.232172431), (51.429244249, -6.956966068), (50.609330646, -8.489616898))
            Line((50.609330646, -8.489616898), (52.900253262, -5.625963628))
        make_face()
        with BuildLine():
            ThreePointArc((40.812395856, 11.732313668), (41.737648648, 9.610880295), (43.553698193, 8.176120268))
            Line((43.553698193, 8.176120268), (50.932299333, 4.852681727))
            ThreePointArc((50.932299333, 4.852681727), (52.468531038, 5.526038233), (54.133954184, 5.72549394))
            Line((54.133954184, 5.72549394), (41.152225194, 25.830154811))
            ThreePointArc((41.152225194, 25.830154811), (40.77793511, 20.159827845), (35.240227029, 18.884488604))
            ThreePointArc((35.240227029, 18.884488604), (38.93187378, 16.013913274), (40.812395856, 11.732313668))
        make_face()
        with BuildLine():
            Line((27.959571324, 44.92244), (23.8125, 44.92244))
            ThreePointArc((23.8125, 44.92244), (23.66488888, 43.745916785), (23.231205774, 42.642324976))
            Line((23.231205774, 42.642324976), (28.289170341, 28.426100235))
            ThreePointArc((28.289170341, 28.426100235), (30.672139622, 34.295050092), (36.777055337, 32.605932237))
            Line((36.777055337, 32.605932237), (29.293210351, 44.196080635))
            ThreePointArc((29.293210351, 44.196080635), (28.718878736, 44.729073603), (27.959571324, 44.92244))
        make_face()
    extrude(amount=BOSS_EXTRUDE3_DEPTH)

    # Fillet6
    fillet6_edges = [part.edges().sort_by_distance(p)[0] for p in [
        (-52.900253262, -5.625963628, 3.175),
        (48.32448179, -0.937118585, 3.175),
        (51.644566792, -5.232172431, 3.175),
        (-48.32448179, -0.937118585, 3.175),
    ]]
    fillet(fillet6_edges, radius=FILLET6_R)


solid = part.part
